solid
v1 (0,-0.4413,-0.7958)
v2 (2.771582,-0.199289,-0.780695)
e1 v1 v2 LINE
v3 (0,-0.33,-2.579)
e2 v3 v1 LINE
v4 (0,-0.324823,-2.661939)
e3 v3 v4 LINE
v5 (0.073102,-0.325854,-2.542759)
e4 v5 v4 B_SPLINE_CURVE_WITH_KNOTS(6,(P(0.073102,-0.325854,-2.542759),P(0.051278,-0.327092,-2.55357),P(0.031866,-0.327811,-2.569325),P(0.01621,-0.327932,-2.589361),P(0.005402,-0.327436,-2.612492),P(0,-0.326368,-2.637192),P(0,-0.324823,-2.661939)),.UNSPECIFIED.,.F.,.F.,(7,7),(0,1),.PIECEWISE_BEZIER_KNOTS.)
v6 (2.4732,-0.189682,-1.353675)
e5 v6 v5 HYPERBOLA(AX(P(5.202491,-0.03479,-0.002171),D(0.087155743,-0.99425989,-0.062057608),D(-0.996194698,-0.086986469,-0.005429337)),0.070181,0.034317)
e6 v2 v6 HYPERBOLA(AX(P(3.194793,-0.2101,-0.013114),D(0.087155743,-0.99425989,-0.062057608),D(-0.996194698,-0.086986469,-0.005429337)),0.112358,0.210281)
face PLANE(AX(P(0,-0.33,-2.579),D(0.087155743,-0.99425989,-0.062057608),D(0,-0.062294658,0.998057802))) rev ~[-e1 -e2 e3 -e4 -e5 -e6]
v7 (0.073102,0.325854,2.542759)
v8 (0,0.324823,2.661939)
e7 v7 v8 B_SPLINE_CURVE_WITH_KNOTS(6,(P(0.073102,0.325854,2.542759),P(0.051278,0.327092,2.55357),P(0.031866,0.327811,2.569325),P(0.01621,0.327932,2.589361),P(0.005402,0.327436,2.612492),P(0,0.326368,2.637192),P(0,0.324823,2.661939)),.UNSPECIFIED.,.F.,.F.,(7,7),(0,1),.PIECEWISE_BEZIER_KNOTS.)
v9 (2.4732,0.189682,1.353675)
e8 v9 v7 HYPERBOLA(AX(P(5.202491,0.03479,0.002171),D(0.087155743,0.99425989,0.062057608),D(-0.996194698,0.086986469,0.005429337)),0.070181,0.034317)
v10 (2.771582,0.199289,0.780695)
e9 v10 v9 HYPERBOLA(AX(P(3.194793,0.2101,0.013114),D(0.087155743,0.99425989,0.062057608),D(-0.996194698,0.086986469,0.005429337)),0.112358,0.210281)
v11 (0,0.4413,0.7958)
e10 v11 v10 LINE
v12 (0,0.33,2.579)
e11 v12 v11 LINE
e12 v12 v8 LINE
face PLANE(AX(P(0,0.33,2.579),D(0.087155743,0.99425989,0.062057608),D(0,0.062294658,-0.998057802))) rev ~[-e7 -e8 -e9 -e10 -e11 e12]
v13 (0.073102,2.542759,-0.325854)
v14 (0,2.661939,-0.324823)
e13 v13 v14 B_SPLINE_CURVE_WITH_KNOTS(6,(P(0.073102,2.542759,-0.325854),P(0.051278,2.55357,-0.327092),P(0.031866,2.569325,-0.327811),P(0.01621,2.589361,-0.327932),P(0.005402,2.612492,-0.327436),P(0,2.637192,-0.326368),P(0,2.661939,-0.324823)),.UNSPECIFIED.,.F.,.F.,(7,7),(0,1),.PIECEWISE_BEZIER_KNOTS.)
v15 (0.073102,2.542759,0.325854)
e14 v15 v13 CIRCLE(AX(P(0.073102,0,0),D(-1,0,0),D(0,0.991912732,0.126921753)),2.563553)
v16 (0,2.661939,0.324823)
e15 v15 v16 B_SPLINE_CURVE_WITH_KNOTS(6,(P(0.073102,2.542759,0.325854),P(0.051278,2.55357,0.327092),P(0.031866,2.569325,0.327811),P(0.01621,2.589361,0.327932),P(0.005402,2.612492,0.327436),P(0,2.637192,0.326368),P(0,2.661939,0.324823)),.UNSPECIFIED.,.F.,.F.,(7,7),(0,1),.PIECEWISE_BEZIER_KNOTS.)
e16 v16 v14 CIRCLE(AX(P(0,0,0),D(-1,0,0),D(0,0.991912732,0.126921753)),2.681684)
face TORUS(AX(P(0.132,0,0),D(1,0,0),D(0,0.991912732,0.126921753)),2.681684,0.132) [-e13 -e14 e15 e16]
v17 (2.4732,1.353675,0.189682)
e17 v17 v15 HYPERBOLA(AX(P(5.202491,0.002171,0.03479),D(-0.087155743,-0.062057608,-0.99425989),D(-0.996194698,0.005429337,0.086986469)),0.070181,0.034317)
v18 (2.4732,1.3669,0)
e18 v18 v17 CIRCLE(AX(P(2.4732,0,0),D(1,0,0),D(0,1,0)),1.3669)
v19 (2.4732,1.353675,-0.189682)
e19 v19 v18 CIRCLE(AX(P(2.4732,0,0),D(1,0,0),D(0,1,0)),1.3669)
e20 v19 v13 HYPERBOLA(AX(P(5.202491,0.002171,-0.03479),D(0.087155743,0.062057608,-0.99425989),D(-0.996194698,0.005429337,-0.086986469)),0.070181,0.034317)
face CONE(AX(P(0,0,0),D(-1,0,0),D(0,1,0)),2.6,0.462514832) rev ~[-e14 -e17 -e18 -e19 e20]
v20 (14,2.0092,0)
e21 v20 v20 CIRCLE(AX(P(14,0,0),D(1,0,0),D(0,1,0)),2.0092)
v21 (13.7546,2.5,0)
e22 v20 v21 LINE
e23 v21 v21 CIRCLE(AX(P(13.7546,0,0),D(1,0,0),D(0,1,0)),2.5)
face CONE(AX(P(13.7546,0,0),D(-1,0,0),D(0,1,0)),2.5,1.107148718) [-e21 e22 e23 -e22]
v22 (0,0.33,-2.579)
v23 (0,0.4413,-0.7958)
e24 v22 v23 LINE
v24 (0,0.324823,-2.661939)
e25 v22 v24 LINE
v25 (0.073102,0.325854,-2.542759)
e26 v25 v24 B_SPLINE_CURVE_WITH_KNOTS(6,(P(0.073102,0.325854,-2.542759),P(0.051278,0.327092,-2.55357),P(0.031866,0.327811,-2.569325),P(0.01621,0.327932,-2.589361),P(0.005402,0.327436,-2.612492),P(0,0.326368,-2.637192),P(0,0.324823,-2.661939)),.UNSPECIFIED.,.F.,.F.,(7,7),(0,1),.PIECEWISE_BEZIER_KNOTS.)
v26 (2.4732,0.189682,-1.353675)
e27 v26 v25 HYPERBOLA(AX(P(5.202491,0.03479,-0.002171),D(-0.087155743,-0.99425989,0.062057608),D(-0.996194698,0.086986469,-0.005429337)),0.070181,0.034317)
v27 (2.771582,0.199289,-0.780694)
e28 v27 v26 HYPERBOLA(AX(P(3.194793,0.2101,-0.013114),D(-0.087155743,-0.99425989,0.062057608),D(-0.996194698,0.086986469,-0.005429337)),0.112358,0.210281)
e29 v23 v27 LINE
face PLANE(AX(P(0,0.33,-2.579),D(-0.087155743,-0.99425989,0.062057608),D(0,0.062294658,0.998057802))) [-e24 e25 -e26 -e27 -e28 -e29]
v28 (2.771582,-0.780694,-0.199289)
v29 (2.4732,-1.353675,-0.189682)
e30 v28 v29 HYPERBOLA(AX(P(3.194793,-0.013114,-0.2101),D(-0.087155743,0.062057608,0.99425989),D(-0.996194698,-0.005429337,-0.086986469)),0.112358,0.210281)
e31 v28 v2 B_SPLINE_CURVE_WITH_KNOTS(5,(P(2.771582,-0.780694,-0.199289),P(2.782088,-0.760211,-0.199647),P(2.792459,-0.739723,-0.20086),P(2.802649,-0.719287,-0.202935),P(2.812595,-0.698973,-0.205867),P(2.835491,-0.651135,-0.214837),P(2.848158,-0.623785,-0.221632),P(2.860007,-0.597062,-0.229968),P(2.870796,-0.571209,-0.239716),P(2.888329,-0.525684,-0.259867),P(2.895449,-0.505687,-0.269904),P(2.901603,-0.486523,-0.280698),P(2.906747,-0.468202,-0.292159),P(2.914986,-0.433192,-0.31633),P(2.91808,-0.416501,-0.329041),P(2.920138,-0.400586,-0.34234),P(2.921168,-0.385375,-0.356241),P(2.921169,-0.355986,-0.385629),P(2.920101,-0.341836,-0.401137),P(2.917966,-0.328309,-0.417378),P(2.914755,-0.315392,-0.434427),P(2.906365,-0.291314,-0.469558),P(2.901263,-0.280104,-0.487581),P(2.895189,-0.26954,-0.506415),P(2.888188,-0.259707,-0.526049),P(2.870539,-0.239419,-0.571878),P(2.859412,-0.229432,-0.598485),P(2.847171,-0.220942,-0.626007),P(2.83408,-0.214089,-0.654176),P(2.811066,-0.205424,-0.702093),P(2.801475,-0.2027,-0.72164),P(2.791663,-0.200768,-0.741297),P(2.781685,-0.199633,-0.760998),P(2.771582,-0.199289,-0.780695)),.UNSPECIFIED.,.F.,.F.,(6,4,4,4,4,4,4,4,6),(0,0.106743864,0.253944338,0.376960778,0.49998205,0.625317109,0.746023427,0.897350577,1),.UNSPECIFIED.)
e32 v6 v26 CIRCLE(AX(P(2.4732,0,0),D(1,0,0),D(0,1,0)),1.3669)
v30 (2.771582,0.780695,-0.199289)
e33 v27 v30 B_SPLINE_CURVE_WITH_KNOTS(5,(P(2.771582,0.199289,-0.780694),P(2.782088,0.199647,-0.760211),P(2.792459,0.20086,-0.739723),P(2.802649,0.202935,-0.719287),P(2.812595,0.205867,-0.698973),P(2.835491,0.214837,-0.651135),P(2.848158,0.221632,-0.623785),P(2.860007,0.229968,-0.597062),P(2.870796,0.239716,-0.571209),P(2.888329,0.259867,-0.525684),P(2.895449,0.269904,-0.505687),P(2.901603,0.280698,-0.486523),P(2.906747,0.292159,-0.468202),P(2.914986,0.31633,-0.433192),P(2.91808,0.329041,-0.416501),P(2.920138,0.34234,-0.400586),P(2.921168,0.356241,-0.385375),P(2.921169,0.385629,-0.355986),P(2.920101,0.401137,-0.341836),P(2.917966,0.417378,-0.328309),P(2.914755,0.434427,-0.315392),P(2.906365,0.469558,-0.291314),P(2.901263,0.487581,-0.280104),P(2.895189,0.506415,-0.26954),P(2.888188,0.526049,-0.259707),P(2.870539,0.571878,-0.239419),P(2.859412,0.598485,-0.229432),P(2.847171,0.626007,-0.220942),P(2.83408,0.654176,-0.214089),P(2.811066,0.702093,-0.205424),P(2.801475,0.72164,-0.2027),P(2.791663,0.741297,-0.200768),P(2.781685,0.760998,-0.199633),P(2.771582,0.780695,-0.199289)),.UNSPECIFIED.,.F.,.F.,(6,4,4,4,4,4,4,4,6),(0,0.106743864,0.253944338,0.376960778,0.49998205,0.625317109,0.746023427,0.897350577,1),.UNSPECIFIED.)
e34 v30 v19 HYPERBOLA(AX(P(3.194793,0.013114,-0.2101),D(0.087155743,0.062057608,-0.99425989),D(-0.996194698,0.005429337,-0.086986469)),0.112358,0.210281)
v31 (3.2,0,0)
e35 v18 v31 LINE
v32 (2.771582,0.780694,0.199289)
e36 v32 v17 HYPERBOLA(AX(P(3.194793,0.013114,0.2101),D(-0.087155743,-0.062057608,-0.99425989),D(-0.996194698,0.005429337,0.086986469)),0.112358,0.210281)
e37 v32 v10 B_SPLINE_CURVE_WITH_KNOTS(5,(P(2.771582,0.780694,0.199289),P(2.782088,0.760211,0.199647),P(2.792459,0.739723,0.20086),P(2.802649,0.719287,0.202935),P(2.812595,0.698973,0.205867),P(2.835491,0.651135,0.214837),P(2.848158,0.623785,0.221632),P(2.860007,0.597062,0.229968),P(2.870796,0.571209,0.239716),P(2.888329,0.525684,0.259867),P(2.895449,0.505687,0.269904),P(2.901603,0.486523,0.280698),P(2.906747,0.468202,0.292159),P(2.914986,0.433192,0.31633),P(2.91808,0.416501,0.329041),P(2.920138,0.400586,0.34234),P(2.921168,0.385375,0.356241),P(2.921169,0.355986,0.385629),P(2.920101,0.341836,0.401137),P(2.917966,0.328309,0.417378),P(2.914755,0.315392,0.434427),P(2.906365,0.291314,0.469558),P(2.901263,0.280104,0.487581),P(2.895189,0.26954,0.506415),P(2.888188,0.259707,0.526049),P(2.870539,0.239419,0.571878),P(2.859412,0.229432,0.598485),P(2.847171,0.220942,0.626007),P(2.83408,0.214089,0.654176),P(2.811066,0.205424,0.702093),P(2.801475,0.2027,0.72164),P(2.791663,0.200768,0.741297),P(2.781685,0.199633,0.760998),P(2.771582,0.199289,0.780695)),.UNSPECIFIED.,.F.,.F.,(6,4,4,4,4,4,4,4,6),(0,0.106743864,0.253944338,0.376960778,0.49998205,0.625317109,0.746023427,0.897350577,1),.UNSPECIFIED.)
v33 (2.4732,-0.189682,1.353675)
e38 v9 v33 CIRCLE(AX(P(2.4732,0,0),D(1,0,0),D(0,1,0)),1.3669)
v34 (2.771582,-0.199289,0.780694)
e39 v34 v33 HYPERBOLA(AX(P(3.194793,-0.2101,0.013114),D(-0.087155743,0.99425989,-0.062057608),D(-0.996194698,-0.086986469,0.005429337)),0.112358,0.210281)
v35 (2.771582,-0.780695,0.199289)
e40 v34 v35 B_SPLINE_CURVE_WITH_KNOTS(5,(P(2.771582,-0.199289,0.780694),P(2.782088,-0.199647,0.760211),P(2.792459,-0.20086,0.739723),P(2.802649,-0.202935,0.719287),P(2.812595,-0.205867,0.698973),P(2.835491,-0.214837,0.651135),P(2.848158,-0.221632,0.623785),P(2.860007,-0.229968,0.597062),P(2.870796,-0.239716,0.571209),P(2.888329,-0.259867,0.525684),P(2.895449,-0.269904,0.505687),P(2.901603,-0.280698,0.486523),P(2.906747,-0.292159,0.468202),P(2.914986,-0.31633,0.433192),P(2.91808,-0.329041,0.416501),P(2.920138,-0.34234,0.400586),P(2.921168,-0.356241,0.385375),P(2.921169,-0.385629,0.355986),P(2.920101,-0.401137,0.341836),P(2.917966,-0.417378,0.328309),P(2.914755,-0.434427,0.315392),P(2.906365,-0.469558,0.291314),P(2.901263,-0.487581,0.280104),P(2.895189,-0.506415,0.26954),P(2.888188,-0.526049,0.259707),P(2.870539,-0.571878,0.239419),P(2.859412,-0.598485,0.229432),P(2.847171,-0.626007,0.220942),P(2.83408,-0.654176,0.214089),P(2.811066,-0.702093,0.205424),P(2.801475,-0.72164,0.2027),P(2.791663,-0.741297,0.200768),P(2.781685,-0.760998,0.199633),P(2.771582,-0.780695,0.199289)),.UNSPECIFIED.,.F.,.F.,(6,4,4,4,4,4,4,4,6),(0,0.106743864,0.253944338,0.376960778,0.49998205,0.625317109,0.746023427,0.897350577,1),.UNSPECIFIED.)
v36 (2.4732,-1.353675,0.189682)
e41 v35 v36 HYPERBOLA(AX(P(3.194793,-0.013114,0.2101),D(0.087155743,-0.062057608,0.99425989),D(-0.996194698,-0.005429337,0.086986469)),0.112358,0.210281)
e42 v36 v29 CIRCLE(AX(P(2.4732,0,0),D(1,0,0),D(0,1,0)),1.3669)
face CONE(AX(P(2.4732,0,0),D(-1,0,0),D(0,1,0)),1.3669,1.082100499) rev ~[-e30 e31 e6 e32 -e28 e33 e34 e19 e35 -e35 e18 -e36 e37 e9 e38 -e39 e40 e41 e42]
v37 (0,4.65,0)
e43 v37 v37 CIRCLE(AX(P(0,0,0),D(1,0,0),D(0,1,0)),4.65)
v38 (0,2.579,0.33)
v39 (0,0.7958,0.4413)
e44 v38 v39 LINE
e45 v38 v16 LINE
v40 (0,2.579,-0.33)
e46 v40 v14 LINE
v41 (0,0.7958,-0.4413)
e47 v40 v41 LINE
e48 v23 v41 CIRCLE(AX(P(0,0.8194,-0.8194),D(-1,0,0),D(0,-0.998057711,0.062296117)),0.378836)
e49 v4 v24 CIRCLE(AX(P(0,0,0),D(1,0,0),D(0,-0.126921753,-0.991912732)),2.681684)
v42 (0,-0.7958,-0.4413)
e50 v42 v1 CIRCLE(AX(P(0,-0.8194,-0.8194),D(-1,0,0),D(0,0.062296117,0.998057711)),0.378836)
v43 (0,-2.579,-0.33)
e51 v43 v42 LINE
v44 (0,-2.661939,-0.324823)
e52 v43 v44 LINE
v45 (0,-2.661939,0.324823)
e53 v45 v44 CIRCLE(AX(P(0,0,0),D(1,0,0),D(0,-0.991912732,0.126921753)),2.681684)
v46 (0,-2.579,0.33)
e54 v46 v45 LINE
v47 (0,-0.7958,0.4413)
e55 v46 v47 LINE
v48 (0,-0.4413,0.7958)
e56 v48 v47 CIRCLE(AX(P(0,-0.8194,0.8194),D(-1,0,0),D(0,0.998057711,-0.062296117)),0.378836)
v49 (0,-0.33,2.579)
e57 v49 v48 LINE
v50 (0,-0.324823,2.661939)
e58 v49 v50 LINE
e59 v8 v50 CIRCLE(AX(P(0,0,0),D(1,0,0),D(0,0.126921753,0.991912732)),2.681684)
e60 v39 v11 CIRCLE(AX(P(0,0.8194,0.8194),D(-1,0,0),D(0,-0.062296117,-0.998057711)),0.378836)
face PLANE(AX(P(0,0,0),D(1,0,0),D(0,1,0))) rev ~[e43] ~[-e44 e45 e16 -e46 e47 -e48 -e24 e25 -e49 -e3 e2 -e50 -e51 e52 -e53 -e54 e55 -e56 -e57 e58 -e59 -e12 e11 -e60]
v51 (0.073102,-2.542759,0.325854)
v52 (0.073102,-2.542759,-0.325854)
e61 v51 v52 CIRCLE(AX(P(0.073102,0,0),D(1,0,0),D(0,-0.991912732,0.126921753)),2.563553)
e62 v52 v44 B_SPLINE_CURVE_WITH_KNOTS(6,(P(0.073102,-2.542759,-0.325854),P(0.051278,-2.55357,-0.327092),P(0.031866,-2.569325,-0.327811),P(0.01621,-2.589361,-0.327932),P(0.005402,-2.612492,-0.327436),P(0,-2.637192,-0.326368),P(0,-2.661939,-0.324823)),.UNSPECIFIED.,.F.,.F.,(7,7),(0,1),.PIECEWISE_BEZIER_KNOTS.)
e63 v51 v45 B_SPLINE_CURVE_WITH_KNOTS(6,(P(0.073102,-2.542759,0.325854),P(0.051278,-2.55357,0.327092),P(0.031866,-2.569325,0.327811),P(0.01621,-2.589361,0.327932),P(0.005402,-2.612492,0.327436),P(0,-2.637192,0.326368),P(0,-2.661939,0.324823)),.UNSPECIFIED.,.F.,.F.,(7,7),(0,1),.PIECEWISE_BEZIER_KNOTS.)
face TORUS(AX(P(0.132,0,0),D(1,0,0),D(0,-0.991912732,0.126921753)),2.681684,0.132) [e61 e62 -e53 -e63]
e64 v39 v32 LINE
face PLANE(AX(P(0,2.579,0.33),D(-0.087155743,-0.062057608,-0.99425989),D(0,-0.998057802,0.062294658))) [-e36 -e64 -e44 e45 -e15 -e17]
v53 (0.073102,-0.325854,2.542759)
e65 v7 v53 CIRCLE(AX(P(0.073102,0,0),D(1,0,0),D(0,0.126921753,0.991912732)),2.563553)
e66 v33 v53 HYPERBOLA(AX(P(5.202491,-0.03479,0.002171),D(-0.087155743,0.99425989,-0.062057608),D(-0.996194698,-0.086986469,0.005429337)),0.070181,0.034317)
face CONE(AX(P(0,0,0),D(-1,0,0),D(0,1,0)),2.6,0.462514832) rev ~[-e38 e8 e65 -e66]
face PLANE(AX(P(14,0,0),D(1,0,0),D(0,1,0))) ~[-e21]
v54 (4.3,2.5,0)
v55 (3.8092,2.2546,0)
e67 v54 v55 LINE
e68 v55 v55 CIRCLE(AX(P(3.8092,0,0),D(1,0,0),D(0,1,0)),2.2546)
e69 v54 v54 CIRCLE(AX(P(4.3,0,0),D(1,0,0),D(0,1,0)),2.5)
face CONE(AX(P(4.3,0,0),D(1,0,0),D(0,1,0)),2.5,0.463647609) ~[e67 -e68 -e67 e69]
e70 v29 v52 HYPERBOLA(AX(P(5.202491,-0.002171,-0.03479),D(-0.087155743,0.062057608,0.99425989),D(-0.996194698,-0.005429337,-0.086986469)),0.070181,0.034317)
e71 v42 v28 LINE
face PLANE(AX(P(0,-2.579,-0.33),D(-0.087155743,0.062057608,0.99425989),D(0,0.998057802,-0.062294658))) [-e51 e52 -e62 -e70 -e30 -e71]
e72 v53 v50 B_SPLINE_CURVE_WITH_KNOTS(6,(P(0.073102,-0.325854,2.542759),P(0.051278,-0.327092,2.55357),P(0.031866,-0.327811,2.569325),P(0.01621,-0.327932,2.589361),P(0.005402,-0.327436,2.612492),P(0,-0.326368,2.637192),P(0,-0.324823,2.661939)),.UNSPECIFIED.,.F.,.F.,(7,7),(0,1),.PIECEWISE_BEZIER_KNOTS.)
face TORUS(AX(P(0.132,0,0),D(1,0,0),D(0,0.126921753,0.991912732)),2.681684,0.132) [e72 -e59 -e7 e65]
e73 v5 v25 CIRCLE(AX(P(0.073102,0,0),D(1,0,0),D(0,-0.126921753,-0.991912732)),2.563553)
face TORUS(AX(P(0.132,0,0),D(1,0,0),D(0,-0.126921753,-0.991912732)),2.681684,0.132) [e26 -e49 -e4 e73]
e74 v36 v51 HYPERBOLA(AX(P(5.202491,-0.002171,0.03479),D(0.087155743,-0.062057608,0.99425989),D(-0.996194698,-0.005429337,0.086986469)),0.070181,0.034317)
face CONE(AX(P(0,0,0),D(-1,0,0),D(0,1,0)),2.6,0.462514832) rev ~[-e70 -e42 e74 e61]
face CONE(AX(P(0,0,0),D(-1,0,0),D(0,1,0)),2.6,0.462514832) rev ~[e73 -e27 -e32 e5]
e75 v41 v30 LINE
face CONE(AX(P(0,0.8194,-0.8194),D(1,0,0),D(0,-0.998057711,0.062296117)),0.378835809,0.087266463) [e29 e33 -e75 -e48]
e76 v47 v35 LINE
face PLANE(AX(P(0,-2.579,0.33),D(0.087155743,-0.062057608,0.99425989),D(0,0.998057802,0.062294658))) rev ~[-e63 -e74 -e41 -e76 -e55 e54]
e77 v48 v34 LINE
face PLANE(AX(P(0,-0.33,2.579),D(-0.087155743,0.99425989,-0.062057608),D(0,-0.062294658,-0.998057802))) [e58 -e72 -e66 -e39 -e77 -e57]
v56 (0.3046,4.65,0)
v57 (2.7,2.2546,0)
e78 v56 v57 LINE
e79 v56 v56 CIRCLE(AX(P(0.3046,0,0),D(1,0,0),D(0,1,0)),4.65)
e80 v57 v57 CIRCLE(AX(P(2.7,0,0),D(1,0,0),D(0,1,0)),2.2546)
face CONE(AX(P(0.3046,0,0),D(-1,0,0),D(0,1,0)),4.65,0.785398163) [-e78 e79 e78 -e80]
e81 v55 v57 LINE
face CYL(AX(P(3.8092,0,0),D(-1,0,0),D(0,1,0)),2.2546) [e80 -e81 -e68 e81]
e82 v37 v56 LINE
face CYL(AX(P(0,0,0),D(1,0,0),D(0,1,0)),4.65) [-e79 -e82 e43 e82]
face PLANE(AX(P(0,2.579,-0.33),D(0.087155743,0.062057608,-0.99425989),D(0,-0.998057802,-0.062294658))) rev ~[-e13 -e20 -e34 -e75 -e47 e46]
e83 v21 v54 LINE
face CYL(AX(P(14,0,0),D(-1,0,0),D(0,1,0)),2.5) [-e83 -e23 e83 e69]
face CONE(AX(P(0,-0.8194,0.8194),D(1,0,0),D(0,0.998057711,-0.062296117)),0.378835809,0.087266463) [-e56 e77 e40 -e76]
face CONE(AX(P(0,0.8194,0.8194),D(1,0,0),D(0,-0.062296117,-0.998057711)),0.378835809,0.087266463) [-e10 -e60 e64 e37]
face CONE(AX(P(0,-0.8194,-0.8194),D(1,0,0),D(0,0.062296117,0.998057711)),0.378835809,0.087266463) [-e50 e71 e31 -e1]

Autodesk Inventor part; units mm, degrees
ref_plane "YZ Plane" through (0, 0, 0) normal (1, 0, 0) x (0, 1, 0)
ref_plane "XZ Plane" through (0, 0, 0) normal (0, 1, 0) x (-1, 0, 0)
sketch "Sketch1" plane through (0, 0, 0) normal (0, 0, 1) x (1, 0, 0)
  line L0 (3.2, 0) -> (14, 0)
  line L1 (14, 0) -> (14, 2.5)
  line L2 (14, 2.5) -> (4.3, 2.5)
  line L3 (4.3, 2.5) -> (3.8092, 2.2546)
  line L4 (3.8092, 2.2546) -> (2.7, 2.2546)
  line L5 (0, 4.65) -> (0, 2.6)
  line L6 (0, 2.6) -> (2.4732, 1.3669)
  line L7 (2.4732, 1.3669) -> (3.2, 0)
  line L8 (-2.8, 0) -> (16.8, 0) projected
  line L9 (0, -0.93) -> (0, 5.58) projected
  line L10 (0, 4.65) -> (0.3046, 4.65)
  line L11 (0.3046, 4.65) -> (2.7, 2.2546)
  line L12 (4.3, 2.5) -> (2.4546, 2.5) construction
  dimension "d1" = 9.7
  dimension "d2" = 5
  dimension "d3" = 4.5092
  dimension "d4" = 5.2
  dimension "d5" = 26.5
  dimension "d6" = 62
  dimension "d7" = 3.2
  dimension "d8" = 0.4908
  dimension "d12" = 9.3
  dimension "d13" = 45
  dimension "d15" = 14
  dimension "d24" = 2.7
revolve "Body" add sketch "Sketch1" angle 360 about axis through (3.2, 0, 0) along (1, 0, 0) contours L7 L6 L5 L10 L11 L4 L3 L2 L1 L0
sketch "Sketch2" plane through (0, 0, 0) normal (-1, 0, 0) x (0, 0, 1)
  line L0 (0, 2.6) -> (0, 0) construction
  line L1 (0, 0) -> (2.6, 0) construction
  arc A0 (0.78, 0) -> (0, 0.78) centre (0, 0) ccw construction
  arc A1 (0.91, 0) -> (0, 0.91) centre (0, 0) ccw construction
  arc A2 (2.579, 0.33) -> (0.33, 2.579) centre (0, 0) ccw
  line L2 (0, 0) -> (1.8385, 1.8385) construction
  line L3 (0.33, 2.579) -> (0.4413, 0.7958)
  line L4 (2.579, 0.33) -> (0.7958, 0.4413)
  arc A3 (0.33, 2.579) -> (0, 2.6) centre (0, 0) ccw
  arc A4 (2.6, 0) -> (2.579, 0.33) centre (0, 0) ccw
  line L5 (0, -6.51) -> (0, 6.51) projected
  line L6 (-6.51, 0) -> (6.51, 0) projected
  arc A5 (0.33, -2.579) -> (2.579, -0.33) centre (0, 0) ccw
  line L7 (0.33, -2.579) -> (0.4413, -0.7958)
  line L8 (2.579, -0.33) -> (0.7958, -0.4413)
  arc A6 (0, -2.6) -> (0.33, -2.579) centre (0, 0) ccw
  arc A7 (2.579, -0.33) -> (2.6, 0) centre (0, 0) ccw
  arc A8 (-0.33, 2.579) -> (-2.579, 0.33) centre (0, 0) ccw
  line L9 (-0.33, 2.579) -> (-0.4413, 0.7958)
  line L10 (-2.579, 0.33) -> (-0.7958, 0.4413)
  arc A9 (0, 2.6) -> (-0.33, 2.579) centre (0, 0) ccw
  arc A10 (-2.579, 0.33) -> (-2.6, 0) centre (0, 0) ccw
  arc A11 (-0.33, -2.579) -> (0, -2.6) centre (0, 0) ccw
  arc A12 (-2.579, -0.33) -> (-0.33, -2.579) centre (0, 0) ccw
  arc A13 (-2.6, 0) -> (-2.579, -0.33) centre (0, 0) ccw
  line L11 (-2.579, -0.33) -> (-0.7958, -0.4413)
  line L12 (-0.33, -2.579) -> (-0.4413, -0.7958)
  arc A14 (0.4413, 0.7958) -> (0.7958, 0.4413) centre (0.8194, 0.8194) ccw
  arc A15 (0.7958, -0.4413) -> (0.4413, -0.7958) centre (0.8194, -0.8194) ccw
  arc A16 (-0.7958, 0.4413) -> (-0.4413, 0.7958) centre (-0.8194, 0.8194) ccw
  arc A17 (-0.4413, -0.7958) -> (-0.7958, -0.4413) centre (-0.8194, -0.8194) ccw
  point P0 (1.8385, -1.8385)
  point P1 (-1.8385, 1.8385)
  point P2 (-1.8385, -1.8385)
  dimension "d17" = 1.56
  dimension "d18" = 1.82
  dimension "d19" = 5.2
  dimension "d20" = 45
  dimension "d21" = 0.33
extrude "Slot" add sketch "Sketch2" against normal up to next draft 5 contours L4 A14 L3 A2 | A5 L7 A15 L8 | L9 A16 L10 A8 | A12 L11 A17 L12
fillet "Fillet1" radius 0.132 4 edges at (0, 2.6, 0) (0, 0, -2.6) (0, -2.6, 0) (0, 0, 2.6)
thread "Thread" size "M5x0.8" class "6g" standard "ISO Metric profile" length 9.7
chamfer "Chamfer1" distance 0.4908 distance2 0.2454 1 edges at (14, -2.5, 0) measured on face at (14, 0.1959, -0.44)
ref_plane "Work Plane2" through (3.35, 0, 0) normal (0, 0, -1) x (1, 0, 0)
equation "\"d1\" = GEL"
equation "\"d2\" = GD"
equation "\"d3\" = BDM"
equation "\"d4\" = SDM"
equation "\"d7\" = INTI"
equation "\"d8\" = GAL"
equation "\"d12\" = KOD"
equation "\"d13\" = 0.5 * SEWI"
equation "\"d15\" = NLG"
equation "\"d24\" = KOH"
equation "\"d17\" = 0.3 * SDM"
equation "\"d18\" = 0.35 * SDM"
equation "\"d19\" = SDM"
equation "\"d21\" = 0.5 * SBR"
equation "\"d23\" = 0.2 * SBR"
equation "\"d10\" = GEL"
equation "\"d25\" = -0.5 * SPD + 0.5 * GD"
equation "\"d26\" = 0.5 * GAL"
equation "\"NLG\" = 14"
equation "\"GEL\" = 9.7"
equation "\"GAL\" = 0.61345 * PTC"
equation "\"SPD\" = NND - 1.2269 * PTC"
equation "\"KOD\" = 9.3"
equation "\"KOH\" = 2.7"
equation "\"SBR\" = 0.66"
equation "\"INTI\" = 3.2"
equation "\"SDM\" = 5.2"
equation "\"GD\" = NND"
equation "\"BDM\" = NND - GAL"
equation "\"SEWI\" = 90deg"
equation "\"d9\" = SDM"
equation "\"GUL\" = 0.61345 * PTC"
equation "\"TOA\" = 30deg"
equation "\"EPV\" = 5.2"
equation "\"THREADDIA\" = 5"
equation "\"PTC\" = 0.8"
equation "\"NND\" = 5"
equation "\"GD1\" = THREADDIA - 1.2269 * PTC"
properties part number "ISO 7046-1 - M5 x 14 - 4.8 - H" material "Steel"
